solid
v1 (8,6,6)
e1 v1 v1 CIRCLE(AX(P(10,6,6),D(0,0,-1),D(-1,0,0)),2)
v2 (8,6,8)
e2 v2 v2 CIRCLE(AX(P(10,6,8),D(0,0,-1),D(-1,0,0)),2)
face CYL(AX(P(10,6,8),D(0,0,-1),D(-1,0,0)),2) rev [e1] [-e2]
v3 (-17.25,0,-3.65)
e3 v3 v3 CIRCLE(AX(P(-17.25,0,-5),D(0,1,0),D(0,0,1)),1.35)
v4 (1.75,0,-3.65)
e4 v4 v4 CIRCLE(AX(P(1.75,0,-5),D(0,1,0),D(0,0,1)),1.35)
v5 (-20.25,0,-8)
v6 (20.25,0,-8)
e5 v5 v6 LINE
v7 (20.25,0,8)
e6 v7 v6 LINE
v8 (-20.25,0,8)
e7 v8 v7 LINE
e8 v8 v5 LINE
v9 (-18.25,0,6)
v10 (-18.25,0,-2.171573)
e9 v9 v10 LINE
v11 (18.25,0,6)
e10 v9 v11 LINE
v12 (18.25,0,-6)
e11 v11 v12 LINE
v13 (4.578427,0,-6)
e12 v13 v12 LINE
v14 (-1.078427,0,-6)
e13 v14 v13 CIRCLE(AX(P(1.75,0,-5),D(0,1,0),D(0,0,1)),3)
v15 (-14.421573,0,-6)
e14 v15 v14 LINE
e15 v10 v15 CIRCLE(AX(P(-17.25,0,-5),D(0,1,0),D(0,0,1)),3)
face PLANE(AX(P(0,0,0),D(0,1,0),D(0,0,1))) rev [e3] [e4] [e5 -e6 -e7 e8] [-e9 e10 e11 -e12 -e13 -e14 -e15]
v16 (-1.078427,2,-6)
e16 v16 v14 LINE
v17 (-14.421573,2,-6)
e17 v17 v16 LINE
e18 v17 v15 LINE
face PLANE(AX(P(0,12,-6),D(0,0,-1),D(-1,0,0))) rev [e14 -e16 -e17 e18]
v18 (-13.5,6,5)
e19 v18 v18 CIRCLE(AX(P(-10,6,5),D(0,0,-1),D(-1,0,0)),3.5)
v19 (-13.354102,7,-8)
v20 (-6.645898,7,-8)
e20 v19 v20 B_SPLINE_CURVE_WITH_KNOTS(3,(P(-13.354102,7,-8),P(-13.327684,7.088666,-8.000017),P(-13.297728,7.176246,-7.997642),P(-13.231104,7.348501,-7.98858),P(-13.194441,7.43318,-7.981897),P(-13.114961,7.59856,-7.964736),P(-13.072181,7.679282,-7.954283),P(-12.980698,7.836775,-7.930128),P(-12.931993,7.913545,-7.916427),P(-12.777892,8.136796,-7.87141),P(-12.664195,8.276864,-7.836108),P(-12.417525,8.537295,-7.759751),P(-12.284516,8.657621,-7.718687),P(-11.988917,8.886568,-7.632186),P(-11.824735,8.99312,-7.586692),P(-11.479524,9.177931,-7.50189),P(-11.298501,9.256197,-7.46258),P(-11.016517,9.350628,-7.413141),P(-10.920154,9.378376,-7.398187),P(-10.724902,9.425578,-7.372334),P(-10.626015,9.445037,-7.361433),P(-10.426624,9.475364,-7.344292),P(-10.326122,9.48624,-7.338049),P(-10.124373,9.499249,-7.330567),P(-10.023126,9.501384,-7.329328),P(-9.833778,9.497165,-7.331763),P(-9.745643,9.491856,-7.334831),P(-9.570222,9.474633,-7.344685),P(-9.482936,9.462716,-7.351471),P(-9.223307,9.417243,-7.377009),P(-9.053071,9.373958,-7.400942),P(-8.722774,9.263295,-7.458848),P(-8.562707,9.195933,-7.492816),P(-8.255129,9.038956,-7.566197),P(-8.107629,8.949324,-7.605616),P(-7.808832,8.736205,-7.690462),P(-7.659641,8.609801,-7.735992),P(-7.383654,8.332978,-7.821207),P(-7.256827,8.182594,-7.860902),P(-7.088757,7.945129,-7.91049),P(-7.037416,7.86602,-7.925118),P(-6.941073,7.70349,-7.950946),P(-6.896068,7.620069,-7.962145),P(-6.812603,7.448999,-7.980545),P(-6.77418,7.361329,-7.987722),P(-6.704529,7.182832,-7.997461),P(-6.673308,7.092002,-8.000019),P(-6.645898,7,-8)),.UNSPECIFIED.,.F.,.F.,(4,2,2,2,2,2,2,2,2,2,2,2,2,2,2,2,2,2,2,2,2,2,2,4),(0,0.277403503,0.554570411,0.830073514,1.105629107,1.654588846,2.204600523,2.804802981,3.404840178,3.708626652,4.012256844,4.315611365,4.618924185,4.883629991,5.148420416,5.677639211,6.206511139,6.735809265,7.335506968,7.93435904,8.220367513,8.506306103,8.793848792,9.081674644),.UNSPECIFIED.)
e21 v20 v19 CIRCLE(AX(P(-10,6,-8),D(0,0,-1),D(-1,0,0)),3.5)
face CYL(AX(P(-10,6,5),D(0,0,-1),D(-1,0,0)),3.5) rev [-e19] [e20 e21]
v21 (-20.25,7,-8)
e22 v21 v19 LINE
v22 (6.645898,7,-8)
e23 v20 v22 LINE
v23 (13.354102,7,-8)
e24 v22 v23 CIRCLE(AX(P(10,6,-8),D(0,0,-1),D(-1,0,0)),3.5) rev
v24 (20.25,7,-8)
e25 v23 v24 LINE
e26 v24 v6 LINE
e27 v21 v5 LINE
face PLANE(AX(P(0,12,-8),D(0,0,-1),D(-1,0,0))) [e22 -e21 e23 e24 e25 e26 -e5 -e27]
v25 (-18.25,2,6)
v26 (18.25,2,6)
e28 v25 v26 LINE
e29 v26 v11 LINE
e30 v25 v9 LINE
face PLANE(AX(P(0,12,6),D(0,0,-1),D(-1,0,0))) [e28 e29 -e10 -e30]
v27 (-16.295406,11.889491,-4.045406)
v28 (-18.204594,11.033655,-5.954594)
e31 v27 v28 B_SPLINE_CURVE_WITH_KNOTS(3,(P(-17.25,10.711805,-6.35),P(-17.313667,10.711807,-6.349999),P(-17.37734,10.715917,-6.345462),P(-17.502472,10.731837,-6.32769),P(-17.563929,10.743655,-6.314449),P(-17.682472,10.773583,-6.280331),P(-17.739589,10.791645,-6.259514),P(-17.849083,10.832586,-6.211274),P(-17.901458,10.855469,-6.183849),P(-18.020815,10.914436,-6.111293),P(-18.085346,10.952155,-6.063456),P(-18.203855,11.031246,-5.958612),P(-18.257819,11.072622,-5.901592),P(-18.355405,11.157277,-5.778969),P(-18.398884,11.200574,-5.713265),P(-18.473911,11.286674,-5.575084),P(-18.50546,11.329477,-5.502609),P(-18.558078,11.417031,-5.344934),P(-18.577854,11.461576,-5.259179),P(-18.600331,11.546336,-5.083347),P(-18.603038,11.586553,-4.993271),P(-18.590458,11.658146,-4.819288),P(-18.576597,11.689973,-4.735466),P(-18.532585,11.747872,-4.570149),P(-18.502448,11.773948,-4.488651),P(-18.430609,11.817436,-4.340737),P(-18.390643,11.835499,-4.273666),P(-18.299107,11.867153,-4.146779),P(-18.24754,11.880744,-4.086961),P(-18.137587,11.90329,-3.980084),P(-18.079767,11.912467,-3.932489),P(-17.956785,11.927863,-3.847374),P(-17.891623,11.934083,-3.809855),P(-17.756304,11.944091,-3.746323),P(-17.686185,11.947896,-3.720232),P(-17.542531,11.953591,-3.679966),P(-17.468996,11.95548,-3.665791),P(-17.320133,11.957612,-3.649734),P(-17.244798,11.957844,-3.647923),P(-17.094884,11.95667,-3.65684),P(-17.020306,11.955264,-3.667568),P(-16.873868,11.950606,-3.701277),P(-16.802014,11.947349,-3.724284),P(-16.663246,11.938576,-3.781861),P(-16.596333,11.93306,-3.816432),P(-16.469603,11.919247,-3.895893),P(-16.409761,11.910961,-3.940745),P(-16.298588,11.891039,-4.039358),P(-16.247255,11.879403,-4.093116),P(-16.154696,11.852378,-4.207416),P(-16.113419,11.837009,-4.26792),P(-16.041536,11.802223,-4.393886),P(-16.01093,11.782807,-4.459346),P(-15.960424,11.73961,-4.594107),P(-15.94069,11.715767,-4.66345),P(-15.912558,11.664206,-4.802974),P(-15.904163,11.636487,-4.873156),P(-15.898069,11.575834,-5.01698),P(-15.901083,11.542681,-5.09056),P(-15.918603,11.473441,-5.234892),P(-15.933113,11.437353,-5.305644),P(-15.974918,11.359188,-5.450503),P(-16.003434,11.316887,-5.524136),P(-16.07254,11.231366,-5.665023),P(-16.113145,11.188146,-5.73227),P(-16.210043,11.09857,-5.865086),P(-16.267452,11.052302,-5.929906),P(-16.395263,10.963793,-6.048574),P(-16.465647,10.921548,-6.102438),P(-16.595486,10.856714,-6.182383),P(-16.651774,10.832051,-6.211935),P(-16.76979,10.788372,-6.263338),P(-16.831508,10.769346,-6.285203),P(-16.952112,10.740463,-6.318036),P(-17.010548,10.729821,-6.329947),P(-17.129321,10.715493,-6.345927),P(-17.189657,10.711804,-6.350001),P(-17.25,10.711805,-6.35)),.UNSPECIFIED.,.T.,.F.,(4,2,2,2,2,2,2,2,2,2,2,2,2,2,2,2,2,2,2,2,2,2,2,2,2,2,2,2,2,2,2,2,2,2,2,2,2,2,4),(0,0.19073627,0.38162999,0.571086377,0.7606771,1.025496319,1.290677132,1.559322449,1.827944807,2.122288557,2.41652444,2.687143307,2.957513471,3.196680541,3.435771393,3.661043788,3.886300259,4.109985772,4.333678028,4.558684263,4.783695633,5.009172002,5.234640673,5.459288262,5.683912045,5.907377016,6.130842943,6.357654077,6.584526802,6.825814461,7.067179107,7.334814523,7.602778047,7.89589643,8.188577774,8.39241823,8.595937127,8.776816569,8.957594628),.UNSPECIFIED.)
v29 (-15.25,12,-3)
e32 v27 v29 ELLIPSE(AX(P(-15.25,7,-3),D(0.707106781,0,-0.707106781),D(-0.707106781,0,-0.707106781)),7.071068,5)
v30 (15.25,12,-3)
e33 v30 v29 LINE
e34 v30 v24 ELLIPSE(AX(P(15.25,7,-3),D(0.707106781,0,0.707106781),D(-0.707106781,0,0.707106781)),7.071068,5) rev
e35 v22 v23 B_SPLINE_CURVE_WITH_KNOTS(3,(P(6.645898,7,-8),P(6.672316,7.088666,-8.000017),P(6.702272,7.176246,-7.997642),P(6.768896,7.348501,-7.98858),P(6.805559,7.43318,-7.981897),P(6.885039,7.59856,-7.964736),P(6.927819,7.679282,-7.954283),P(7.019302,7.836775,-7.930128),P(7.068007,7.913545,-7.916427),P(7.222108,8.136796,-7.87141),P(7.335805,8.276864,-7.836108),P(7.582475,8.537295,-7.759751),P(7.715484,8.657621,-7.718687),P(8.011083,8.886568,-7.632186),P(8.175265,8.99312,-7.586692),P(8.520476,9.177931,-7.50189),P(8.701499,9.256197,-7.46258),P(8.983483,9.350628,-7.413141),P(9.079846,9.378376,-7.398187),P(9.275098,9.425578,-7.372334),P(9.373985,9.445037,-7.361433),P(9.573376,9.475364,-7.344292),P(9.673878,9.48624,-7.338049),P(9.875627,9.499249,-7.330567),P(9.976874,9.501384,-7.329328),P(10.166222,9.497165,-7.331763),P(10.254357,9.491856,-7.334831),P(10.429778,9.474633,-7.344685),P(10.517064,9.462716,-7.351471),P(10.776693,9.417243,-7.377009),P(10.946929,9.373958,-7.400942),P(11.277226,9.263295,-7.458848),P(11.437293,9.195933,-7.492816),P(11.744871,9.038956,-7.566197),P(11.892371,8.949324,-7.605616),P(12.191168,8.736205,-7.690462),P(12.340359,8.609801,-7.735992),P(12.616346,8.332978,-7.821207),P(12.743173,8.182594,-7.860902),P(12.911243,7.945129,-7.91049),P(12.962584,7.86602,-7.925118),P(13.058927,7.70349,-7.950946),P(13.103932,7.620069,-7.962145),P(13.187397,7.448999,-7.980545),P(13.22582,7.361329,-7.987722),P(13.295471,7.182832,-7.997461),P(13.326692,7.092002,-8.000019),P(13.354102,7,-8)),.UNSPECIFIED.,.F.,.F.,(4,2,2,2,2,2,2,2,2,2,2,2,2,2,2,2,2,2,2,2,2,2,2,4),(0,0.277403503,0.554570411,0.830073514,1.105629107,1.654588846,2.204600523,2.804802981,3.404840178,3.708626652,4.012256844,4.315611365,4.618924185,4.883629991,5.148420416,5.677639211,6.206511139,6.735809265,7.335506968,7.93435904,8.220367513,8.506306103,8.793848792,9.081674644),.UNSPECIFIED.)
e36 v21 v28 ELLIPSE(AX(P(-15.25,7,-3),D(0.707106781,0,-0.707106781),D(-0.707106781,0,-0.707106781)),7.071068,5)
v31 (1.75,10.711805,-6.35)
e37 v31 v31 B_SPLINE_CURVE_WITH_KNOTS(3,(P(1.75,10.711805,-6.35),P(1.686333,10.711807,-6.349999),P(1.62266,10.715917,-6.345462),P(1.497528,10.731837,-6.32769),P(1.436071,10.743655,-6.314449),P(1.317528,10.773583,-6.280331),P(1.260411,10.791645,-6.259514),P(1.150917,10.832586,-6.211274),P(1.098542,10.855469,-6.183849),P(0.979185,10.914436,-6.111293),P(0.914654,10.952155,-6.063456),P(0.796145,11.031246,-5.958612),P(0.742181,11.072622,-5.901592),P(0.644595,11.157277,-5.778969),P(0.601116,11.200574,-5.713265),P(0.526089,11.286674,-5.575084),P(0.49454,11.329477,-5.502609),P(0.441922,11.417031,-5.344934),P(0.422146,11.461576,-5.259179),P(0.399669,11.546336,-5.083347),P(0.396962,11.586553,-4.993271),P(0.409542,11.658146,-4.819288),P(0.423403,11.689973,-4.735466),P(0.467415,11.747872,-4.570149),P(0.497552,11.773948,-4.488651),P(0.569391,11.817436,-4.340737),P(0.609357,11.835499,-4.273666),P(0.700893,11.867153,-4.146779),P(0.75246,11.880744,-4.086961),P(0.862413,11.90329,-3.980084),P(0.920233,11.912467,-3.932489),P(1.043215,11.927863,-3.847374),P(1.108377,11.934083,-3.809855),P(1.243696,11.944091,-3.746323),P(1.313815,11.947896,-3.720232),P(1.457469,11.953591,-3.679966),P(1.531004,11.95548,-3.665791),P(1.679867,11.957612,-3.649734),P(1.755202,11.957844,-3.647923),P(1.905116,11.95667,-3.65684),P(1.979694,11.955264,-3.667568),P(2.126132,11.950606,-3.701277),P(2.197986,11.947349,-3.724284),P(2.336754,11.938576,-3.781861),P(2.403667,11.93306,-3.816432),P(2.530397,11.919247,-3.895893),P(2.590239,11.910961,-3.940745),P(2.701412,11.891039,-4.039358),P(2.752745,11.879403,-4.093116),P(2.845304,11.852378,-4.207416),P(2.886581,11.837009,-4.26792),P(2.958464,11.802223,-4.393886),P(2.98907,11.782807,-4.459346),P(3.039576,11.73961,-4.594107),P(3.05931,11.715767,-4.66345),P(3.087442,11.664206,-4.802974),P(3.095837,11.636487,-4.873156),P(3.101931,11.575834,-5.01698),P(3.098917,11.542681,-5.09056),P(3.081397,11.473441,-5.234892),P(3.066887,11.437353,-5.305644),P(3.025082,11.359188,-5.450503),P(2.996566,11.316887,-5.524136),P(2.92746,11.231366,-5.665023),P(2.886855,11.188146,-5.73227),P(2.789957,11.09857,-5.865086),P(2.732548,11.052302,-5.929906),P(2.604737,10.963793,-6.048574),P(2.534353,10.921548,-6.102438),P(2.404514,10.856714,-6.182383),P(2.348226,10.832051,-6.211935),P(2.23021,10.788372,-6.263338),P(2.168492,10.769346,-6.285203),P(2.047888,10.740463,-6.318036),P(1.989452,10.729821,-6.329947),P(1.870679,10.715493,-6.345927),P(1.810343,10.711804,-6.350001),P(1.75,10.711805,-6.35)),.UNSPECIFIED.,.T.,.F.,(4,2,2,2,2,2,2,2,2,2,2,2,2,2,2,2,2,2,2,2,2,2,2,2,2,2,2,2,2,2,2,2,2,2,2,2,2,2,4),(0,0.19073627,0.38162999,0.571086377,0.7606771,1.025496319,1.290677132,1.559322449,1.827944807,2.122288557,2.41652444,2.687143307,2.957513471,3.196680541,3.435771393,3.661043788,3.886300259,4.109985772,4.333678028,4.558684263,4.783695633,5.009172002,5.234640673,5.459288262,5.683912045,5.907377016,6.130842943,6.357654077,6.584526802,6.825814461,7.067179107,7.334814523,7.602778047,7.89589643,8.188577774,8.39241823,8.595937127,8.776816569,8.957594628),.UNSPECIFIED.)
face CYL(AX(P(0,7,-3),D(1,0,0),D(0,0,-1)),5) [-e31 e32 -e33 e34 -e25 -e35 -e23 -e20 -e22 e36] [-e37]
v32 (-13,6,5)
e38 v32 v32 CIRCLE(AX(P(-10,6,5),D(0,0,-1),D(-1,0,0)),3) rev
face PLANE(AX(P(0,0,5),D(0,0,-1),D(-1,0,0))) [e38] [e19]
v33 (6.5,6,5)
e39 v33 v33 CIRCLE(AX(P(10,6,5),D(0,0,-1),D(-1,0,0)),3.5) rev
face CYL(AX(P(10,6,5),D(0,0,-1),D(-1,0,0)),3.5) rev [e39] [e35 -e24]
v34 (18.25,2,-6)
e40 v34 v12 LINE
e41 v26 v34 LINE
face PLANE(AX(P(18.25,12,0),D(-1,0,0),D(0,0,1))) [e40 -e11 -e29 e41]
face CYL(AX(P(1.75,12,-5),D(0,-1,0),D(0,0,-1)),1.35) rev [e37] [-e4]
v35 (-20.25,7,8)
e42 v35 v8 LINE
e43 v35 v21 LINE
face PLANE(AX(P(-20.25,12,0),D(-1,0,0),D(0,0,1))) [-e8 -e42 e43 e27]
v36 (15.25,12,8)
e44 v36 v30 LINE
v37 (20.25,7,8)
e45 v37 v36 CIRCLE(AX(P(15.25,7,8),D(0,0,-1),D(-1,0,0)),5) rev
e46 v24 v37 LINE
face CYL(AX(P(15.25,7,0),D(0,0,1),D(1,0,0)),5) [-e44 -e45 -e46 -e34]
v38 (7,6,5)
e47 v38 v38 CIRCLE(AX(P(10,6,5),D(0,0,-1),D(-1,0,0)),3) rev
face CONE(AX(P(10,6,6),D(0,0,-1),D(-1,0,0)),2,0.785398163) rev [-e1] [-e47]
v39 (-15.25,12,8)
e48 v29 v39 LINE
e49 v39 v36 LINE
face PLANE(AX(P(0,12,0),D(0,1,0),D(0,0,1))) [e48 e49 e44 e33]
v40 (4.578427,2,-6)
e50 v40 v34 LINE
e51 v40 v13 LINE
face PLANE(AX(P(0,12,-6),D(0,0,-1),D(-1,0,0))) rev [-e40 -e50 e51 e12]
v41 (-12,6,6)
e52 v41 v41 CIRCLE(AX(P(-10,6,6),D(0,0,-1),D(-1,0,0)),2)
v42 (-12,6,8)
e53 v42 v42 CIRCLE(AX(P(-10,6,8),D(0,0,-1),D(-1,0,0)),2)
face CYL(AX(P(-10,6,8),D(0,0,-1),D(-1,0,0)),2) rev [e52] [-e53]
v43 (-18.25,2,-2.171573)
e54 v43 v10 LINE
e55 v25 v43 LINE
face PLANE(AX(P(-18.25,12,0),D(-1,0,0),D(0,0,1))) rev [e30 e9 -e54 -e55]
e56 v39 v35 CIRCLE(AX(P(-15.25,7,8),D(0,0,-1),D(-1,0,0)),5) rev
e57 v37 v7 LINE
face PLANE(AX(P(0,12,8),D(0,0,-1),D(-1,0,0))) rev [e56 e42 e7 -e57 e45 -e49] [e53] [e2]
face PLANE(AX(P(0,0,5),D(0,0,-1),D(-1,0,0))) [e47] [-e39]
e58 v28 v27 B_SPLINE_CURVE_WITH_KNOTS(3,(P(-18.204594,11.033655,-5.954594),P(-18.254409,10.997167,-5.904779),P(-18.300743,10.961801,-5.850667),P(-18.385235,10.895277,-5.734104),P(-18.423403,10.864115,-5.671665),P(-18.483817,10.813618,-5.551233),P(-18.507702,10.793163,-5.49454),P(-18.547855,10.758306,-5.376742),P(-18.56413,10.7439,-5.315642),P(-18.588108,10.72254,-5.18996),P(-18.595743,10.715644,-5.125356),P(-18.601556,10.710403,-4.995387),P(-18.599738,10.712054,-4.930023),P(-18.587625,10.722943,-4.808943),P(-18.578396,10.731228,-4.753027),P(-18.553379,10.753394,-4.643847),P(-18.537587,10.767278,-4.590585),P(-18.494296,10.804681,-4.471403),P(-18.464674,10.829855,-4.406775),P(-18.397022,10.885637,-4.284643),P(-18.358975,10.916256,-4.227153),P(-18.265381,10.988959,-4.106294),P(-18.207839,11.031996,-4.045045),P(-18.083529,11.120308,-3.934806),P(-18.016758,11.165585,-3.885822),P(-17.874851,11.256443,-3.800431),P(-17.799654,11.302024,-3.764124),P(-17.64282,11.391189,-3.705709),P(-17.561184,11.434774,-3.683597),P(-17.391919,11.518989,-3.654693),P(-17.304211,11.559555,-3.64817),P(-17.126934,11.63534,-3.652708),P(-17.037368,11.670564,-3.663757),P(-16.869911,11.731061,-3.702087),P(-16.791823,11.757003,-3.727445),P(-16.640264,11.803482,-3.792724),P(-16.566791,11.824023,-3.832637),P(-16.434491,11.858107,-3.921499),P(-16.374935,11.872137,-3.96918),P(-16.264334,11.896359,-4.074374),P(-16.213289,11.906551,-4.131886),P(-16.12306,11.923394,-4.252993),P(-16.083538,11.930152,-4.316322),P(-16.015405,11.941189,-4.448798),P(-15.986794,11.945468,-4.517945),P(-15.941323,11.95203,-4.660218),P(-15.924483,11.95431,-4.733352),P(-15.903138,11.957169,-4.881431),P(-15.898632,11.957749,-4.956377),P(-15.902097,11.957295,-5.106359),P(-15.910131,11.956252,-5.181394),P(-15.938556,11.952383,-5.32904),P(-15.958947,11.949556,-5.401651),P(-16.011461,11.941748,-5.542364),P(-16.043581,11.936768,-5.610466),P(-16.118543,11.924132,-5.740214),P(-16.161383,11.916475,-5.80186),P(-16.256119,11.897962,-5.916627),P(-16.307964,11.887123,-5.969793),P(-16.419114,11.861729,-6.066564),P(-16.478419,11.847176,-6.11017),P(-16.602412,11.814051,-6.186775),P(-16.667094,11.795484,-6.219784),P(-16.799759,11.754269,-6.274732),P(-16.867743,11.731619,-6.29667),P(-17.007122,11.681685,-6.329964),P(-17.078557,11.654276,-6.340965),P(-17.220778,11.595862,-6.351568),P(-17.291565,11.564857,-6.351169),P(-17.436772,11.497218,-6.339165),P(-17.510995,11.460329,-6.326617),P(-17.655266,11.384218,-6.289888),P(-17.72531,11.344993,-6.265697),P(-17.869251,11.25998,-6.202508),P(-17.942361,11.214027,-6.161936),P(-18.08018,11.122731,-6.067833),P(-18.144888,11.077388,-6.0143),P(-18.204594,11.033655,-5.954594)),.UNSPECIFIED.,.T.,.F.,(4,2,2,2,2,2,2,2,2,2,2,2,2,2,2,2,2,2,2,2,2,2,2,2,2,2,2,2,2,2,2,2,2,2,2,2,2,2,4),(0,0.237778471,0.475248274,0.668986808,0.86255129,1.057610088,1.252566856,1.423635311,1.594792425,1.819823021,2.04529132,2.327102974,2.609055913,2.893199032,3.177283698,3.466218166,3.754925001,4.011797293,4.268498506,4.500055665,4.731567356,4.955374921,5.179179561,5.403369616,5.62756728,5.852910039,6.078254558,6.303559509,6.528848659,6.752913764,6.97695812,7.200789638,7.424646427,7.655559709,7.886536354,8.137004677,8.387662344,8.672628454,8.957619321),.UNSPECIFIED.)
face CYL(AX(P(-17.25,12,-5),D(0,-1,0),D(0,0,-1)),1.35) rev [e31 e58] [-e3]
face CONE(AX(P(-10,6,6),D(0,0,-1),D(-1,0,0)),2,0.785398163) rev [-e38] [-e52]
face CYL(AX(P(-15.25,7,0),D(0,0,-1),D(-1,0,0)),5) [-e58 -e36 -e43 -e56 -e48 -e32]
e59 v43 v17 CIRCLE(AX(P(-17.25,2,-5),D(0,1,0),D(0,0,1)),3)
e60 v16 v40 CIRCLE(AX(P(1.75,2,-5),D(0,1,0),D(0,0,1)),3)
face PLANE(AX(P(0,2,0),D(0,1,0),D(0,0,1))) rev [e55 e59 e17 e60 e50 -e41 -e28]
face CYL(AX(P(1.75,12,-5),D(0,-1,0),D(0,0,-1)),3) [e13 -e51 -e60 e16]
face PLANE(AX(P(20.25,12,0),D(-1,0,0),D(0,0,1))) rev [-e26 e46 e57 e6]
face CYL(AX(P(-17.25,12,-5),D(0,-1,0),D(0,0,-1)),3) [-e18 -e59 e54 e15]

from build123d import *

# Parameters (mm, degrees)
SKETCH1_W           = 40.5
SKETCH1_H           = 16
SKETCH1_R           = 1.35
BOSS_EXTRUDE1_DEPTH = 12
BOSS_EXTRUDE2_START = 2
BOSS_EXTRUDE2_DEPTH = 10
SKETCH2_R           = 3.5
SKETCH2_R_2         = 2
CUT_EXTRUDE1_DEPTH  = 13
SKETCH2_3_R         = 2
CUT_EXTRUDE2_DEPTH  = 29.461596933
CHAMFER1_SIZE       = 1
FILLET1_R           = 5


with BuildPart() as part:
    # Sketch1 → Boss-Extrude1 (new body)
    with BuildSketch(Plane(origin=(0, 0, 0), x_dir=(1, 0, 0), z_dir=(0, 1, 0))):
        Rectangle(SKETCH1_W, SKETCH1_H)
        with Locations(Location((-17.25, 5, 0), (0, 0, 270))):
            Circle(SKETCH1_R, mode=Mode.SUBTRACT)
        with BuildLine():
            Line((-14.421572875, 6), (-1.078427125, 6))
            ThreePointArc((-1.078427125, 6), (1.75, 2), (4.578427125, 6))
            Line((4.578427125, 6), (18.25, 6))
            Line((18.25, 6), (18.25, -6))
            Line((18.25, -6), (-18.25, -6))
            Line((-18.25, -6), (-18.25, 2.171572875))
            ThreePointArc((-18.25, 2.171572875), (-15.128679656, 2.878679656), (-14.421572875, 6))
        make_face(mode=Mode.SUBTRACT)
        with Locations(Location((1.75, 5, 0), (0, 0, 270))):
            Circle(SKETCH1_R, mode=Mode.SUBTRACT)
    extrude(amount=BOSS_EXTRUDE1_DEPTH)

    # Sketch1<3> → Boss-Extrude2 (add)
    with BuildSketch(Plane(origin=(0, 0, 0), x_dir=(1, 0, 0), z_dir=(0, 1, 0)).offset(BOSS_EXTRUDE2_START)):
        with BuildLine():
            ThreePointArc((-14.25, 5), (-15.517949192, 2.550510257), (-18.25, 2.171572875))
            Line((-18.25, 2.171572875), (-18.25, -6))
            Line((-18.25, -6), (18.25, -6))
            Line((18.25, -6), (18.25, 6))
            Line((18.25, 6), (4.578427125, 6))
            ThreePointArc((4.578427125, 6), (4.706795679, 5.507305936), (4.75, 5))
            ThreePointArc((4.75, 5), (1.242694064, 2.043204321), (-1.078427125, 6))
            Line((-1.078427125, 6), (-14.421572875, 6))
            ThreePointArc((-14.421572875, 6), (-14.293204321, 5.507305936), (-14.25, 5))
        make_face()
    extrude(amount=BOSS_EXTRUDE2_DEPTH)

    # Sketch2 → Cut-Extrude1 (cut)
    # profile 1 of 4: a face of its own
    with BuildSketch(Plane(origin=(0, 0, -8), x_dir=(-1, 0, 0), z_dir=(0, 0, -1))):
        with Locations((-10, 6)):
            Circle(SKETCH2_R)
        with Locations((-10, 6)):
            Circle(SKETCH2_R_2, mode=Mode.SUBTRACT)
    # profile 2 of 4: a face of its own
    with BuildSketch(Plane(origin=(0, 0, -8), x_dir=(-1, 0, 0), z_dir=(0, 0, -1))):
        with Locations((-10, 6)):
            Circle(SKETCH2_R_2)
    # profile 3 of 4: a face of its own
    with BuildSketch(Plane(origin=(0, 0, -8), x_dir=(-1, 0, 0), z_dir=(0, 0, -1))):
        with Locations((10, 6)):
            Circle(SKETCH2_R)
        with Locations((10, 6)):
            Circle(SKETCH2_R_2, mode=Mode.SUBTRACT)
    # profile 4 of 4: a face of its own
    with BuildSketch(Plane(origin=(0, 0, -8), x_dir=(-1, 0, 0), z_dir=(0, 0, -1))):
        with Locations((10, 6)):
            Circle(SKETCH2_R_2)
    extrude(amount=-CUT_EXTRUDE1_DEPTH, mode=Mode.SUBTRACT)

    # Sketch2<3> → Cut-Extrude2 (cut, through all)
    with BuildSketch(Plane(origin=(0, 0, -8), x_dir=(-1, 0, 0), z_dir=(0, 0, -1))):
        with Locations((-10, 6)):
            Circle(SKETCH2_3_R)
        with Locations((10, 6)):
            Circle(SKETCH2_3_R)
    extrude(amount=-CUT_EXTRUDE2_DEPTH, mode=Mode.SUBTRACT)

    # Chamfer1
    chamfer1_edges = [part.edges().sort_by_distance(p)[0] for p in [
        (12, 6, 5),
        (-8, 6, 5),
    ]]
    chamfer(chamfer1_edges, length=CHAMFER1_SIZE)

    # Fillet1
    # the kernel refuses this fillet: 5 mm, written as the material it takes off along each edge
    with BuildSketch(Plane(origin=(32.75, 12, -8), x_dir=(0, -1, 0), z_dir=(-1, 0, 0))) as fillet1_piece_1:
        with BuildLine():
            CenterArc((FILLET1_R, FILLET1_R), FILLET1_R, 180, 90)
            Line((0, FILLET1_R), (0, 0))
            Line((0, 0), (FILLET1_R, 0))
        make_face()
    extrude(amount=65.5, mode=Mode.SUBTRACT)
    with BuildSketch(Plane(origin=(20.25, 12, 20.5), x_dir=(0, -1, 0), z_dir=(0, 0, -1))) as fillet1_piece_2:
        with BuildLine():
            CenterArc((FILLET1_R, FILLET1_R), FILLET1_R, 180, 90)
            Line((0, FILLET1_R), (0, 0))
            Line((0, 0), (FILLET1_R, 0))
        make_face()
    extrude(amount=41, mode=Mode.SUBTRACT)
    with BuildSketch(Plane(origin=(-20.25, 12, -20.5), x_dir=(1, 0, 0), z_dir=(0, 0, 1))) as fillet1_piece_3:
        with BuildLine():
            CenterArc((FILLET1_R, -FILLET1_R), FILLET1_R, 90, 90)
            Line((0, -FILLET1_R), (0, 0))
            Line((0, 0), (FILLET1_R, 0))
        make_face()
    extrude(amount=41, mode=Mode.SUBTRACT)


solid = part.part
